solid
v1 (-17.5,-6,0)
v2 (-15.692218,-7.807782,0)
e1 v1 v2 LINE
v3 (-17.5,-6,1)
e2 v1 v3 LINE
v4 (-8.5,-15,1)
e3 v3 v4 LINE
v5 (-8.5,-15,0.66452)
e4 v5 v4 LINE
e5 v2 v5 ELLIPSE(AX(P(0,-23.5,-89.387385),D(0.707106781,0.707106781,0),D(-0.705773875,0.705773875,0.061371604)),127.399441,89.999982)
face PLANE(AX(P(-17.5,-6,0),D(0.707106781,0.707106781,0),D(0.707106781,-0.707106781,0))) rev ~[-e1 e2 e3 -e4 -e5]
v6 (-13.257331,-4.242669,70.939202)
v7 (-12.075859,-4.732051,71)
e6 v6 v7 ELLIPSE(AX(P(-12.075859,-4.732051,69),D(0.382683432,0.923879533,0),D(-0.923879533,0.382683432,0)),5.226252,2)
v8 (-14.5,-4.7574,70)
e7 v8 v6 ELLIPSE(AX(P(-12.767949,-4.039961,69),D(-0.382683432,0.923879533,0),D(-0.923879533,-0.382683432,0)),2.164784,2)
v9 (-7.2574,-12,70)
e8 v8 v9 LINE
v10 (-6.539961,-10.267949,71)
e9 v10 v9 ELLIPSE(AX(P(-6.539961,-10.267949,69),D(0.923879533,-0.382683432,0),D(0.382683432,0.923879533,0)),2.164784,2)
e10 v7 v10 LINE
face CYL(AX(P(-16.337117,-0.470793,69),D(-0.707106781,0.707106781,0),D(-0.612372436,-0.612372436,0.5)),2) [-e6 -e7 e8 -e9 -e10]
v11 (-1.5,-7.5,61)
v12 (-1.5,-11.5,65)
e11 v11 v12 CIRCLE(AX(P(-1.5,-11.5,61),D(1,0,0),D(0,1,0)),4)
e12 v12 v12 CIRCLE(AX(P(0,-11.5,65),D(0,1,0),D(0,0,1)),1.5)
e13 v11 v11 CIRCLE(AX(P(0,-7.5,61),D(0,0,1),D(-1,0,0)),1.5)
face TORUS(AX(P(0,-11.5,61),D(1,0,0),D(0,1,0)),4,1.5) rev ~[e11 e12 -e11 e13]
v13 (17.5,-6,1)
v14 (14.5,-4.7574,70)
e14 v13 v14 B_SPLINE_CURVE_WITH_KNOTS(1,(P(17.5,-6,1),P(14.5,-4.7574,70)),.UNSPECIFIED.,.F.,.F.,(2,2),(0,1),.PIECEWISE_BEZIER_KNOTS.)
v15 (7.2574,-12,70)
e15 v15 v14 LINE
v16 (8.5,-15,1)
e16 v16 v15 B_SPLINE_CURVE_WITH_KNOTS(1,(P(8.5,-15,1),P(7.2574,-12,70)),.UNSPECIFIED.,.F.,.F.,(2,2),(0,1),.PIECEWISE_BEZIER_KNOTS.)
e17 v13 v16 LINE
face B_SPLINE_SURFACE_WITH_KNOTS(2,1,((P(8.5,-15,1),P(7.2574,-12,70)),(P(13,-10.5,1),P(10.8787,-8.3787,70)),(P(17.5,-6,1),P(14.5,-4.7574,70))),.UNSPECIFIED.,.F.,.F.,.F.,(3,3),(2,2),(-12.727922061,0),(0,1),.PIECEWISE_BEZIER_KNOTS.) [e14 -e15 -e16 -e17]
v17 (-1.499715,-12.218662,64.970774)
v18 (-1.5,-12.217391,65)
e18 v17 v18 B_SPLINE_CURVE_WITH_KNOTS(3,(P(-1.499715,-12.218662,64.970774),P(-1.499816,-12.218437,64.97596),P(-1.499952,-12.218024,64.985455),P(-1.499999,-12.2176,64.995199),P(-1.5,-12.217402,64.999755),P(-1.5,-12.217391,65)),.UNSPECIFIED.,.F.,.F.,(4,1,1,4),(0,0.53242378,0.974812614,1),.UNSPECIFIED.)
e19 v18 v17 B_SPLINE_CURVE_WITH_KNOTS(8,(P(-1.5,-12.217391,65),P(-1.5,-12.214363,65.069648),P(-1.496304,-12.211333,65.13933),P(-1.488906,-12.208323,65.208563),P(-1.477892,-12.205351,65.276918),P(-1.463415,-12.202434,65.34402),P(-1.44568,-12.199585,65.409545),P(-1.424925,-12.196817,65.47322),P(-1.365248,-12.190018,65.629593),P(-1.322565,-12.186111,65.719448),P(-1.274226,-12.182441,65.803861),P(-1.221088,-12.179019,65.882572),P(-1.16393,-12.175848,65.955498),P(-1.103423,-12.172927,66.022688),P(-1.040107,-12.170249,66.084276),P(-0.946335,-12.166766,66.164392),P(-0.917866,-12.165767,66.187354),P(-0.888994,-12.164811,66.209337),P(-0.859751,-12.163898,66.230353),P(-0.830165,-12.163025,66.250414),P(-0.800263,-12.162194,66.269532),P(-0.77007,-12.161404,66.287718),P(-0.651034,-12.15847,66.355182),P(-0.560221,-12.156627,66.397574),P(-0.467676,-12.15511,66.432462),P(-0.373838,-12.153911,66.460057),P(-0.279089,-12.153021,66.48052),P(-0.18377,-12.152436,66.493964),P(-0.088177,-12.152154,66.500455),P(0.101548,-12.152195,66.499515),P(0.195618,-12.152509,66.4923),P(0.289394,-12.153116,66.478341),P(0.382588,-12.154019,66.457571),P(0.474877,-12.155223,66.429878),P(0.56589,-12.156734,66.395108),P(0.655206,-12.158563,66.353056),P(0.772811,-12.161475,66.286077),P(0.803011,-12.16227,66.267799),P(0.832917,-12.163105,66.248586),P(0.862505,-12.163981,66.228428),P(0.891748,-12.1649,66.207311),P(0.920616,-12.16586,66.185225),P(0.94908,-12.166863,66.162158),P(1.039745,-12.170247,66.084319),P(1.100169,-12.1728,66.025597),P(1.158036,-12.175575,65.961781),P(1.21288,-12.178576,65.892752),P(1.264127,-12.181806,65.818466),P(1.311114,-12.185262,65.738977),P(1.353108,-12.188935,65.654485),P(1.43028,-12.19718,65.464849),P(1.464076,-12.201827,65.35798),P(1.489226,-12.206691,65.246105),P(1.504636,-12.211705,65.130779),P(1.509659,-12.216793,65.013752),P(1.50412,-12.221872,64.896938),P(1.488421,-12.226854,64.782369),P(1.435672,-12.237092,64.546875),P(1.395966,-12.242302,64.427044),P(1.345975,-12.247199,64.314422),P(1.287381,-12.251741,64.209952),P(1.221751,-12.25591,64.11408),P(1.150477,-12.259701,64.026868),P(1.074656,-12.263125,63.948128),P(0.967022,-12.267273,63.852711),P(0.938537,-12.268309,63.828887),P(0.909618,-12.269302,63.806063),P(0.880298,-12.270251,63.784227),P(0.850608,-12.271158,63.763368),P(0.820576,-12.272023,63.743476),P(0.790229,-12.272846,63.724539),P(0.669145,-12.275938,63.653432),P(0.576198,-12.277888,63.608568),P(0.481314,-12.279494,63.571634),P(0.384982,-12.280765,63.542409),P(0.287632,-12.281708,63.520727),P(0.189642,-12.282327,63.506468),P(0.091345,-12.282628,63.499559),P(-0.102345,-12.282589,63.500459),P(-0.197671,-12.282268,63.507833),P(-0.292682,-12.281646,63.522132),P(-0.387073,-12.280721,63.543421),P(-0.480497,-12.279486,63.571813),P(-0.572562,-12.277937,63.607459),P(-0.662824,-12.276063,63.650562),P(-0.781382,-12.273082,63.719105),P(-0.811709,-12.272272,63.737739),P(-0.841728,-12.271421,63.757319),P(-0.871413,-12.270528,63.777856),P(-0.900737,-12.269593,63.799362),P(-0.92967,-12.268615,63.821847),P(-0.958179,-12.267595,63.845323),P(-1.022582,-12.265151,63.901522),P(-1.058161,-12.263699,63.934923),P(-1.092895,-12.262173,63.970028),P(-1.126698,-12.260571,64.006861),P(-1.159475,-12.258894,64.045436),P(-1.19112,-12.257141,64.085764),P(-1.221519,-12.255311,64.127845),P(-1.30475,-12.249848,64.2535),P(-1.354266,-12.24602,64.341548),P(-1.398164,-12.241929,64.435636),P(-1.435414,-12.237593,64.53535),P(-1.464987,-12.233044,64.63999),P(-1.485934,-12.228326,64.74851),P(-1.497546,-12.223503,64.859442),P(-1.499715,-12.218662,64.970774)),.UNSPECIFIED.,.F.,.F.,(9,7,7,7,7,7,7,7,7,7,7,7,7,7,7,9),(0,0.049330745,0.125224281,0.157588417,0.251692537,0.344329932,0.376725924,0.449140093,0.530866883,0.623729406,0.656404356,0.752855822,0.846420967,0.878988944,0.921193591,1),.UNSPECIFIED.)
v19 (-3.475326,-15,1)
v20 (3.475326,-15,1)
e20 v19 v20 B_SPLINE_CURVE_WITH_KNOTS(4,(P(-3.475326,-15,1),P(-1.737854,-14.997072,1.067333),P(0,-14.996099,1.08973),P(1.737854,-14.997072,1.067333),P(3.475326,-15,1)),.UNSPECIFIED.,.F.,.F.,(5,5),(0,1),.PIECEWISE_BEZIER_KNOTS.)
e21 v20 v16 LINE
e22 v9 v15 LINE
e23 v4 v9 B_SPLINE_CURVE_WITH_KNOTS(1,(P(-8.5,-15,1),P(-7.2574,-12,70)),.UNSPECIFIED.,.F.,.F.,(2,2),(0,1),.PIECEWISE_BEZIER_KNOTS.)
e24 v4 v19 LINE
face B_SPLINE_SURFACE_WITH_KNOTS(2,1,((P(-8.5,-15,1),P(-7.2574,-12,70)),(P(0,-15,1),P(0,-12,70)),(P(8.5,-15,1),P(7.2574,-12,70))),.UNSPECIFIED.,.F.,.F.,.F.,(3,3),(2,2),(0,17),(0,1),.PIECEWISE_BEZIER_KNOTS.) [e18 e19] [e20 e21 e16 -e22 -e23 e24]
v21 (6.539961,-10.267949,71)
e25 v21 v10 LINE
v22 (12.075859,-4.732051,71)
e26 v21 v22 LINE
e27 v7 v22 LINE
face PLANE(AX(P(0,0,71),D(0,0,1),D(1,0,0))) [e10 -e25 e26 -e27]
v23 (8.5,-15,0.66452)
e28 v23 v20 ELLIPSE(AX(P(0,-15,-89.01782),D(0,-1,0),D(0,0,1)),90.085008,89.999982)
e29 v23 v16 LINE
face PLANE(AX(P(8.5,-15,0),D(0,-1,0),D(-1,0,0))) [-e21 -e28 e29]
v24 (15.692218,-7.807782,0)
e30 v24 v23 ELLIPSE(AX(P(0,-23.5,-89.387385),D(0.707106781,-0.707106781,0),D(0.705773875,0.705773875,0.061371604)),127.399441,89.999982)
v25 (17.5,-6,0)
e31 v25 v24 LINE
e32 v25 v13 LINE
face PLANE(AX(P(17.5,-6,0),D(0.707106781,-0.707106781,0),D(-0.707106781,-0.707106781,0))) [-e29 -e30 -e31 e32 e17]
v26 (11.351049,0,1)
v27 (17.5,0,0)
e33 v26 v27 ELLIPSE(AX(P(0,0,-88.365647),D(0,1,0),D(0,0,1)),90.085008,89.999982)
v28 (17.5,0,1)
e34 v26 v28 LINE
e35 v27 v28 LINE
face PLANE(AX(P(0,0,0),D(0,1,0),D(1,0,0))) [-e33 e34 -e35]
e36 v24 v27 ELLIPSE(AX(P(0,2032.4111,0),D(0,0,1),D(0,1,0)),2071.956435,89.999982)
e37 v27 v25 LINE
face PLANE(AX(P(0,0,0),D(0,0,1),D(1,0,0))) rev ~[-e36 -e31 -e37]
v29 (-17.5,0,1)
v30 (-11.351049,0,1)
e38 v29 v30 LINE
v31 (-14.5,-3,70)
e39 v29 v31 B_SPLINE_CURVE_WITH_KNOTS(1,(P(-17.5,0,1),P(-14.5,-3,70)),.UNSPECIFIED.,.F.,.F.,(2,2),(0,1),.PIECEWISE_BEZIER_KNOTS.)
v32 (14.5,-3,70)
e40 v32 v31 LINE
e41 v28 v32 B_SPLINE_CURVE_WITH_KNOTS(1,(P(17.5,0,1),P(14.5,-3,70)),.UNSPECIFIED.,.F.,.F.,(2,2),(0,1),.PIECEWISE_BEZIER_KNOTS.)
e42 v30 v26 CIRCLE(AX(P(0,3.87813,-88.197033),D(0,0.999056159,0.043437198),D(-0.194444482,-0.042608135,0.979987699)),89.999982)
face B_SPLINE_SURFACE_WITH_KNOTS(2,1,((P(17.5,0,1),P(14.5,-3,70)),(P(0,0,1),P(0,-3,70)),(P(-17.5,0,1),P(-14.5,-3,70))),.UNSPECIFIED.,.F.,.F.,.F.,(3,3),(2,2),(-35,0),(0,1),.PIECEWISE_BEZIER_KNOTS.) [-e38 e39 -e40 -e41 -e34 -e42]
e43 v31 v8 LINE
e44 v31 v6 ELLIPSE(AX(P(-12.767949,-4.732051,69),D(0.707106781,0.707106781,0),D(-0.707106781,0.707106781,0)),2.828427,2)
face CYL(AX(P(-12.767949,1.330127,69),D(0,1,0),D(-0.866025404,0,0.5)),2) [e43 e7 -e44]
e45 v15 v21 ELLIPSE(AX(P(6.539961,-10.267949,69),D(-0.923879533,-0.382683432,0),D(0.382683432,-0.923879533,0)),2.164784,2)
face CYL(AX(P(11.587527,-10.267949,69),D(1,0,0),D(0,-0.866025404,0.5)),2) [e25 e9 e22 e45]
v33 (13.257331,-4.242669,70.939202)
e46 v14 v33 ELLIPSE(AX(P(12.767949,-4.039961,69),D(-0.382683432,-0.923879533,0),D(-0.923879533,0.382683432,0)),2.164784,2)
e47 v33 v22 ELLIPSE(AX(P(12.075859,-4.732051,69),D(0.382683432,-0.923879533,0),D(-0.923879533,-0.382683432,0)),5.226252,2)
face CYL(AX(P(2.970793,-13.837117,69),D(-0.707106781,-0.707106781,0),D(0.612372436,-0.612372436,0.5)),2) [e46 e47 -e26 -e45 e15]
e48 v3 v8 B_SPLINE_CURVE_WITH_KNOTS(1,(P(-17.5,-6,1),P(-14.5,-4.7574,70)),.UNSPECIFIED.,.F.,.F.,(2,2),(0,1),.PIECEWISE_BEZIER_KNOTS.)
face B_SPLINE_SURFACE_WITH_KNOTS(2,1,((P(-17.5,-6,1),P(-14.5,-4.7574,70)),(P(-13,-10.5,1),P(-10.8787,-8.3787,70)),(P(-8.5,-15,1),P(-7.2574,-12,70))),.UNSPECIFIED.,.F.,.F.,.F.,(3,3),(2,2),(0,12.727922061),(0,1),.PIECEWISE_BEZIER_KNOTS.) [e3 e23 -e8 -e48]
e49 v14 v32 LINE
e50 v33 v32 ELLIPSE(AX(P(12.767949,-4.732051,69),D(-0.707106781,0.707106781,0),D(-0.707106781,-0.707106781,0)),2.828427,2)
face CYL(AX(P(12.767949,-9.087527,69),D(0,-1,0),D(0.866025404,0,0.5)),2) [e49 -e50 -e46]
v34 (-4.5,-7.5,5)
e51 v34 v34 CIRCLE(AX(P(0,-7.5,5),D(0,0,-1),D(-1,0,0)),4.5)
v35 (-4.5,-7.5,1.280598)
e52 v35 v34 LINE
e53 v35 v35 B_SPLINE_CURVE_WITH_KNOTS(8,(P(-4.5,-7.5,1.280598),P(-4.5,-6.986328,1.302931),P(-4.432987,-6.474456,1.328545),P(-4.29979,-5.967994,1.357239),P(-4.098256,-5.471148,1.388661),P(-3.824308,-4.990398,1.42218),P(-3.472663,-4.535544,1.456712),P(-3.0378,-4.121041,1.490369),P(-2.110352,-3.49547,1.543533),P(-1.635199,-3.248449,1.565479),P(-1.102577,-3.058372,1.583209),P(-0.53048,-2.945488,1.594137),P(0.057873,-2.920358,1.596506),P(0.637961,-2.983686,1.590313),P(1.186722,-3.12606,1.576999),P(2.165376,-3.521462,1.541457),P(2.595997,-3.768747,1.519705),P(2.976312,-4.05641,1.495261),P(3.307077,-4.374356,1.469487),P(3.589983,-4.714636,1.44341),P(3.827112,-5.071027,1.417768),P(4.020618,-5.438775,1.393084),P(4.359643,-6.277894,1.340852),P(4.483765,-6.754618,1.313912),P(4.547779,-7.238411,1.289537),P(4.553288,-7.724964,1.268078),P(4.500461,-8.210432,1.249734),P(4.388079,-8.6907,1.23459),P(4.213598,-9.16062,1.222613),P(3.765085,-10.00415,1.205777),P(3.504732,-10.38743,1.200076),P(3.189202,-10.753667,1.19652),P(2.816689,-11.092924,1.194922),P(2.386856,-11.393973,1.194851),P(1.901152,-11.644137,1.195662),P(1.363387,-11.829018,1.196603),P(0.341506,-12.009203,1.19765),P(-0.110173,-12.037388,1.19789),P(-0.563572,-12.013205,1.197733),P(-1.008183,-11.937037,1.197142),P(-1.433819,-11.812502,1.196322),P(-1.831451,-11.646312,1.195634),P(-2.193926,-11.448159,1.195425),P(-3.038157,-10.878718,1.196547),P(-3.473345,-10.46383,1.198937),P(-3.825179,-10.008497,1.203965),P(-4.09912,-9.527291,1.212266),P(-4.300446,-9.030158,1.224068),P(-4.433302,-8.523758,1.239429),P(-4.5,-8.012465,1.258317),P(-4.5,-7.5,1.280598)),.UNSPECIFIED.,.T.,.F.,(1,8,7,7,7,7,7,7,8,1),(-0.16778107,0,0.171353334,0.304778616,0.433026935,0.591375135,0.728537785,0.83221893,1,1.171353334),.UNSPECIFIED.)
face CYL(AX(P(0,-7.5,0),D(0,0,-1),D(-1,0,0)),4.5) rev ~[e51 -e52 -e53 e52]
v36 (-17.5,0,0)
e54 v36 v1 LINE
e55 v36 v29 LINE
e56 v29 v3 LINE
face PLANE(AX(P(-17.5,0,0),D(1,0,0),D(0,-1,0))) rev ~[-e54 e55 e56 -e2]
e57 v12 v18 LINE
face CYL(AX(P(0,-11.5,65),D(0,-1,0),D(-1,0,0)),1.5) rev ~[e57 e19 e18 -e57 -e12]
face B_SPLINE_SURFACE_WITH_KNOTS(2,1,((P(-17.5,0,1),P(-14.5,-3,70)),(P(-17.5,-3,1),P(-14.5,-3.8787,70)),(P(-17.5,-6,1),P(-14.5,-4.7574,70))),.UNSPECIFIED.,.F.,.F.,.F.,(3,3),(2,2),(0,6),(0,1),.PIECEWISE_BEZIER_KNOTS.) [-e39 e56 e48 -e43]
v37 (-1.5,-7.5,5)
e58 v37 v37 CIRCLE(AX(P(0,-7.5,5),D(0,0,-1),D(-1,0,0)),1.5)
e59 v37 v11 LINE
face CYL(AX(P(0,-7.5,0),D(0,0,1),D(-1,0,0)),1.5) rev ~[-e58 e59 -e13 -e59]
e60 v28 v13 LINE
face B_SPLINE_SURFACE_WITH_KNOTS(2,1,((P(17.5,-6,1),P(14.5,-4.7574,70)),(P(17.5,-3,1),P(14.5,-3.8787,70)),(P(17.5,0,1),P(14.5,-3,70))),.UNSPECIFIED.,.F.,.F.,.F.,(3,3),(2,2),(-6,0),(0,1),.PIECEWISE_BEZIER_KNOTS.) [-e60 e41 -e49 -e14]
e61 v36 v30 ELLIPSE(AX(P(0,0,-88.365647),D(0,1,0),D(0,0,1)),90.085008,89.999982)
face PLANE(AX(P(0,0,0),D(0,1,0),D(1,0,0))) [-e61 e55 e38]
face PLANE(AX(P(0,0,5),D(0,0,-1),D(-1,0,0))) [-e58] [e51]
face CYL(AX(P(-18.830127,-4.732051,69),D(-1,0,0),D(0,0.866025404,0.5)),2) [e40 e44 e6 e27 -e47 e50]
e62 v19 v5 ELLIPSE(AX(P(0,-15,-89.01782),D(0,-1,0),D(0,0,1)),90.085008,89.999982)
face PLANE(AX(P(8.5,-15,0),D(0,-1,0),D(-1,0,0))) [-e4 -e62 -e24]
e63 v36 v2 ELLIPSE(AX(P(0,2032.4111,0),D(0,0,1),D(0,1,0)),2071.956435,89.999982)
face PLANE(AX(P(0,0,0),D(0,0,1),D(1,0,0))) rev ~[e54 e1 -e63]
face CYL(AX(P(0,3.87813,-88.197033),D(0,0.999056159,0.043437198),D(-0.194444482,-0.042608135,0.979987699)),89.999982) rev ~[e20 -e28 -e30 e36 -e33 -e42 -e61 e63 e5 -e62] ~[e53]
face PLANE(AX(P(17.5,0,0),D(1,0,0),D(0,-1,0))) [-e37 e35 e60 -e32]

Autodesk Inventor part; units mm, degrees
ref_plane "YZ Plane" through (0, 0, 0) normal (1, 0, 0) x (0, 1, 0)
ref_plane "XZ Plane" through (0, 0, 0) normal (0, 1, 0) x (-1, 0, 0)
sketch "Sketch1" plane through (0, 0, 0) normal (0, 0, 1) x (1, 0, 0)
  line L0 (0, 0) -> (17.5, 0)
  line L1 (17.5, 0) -> (17.5, -6)
  line L2 (17.5, -6) -> (8.5, -15)
  line L3 (8.5, -15) -> (0, -15)
  line L4 (0, 0) -> (0, -15)
  line L5 (0, 0) -> (-17.5, 0)
  line L6 (-17.5, 0) -> (-17.5, -6)
  line L7 (-17.5, -6) -> (-8.5, -15)
  line L8 (-8.5, -15) -> (0, -15)
  dimension "d0" = 35
  dimension "d1" = 15
  dimension "d2" = 45
  dimension "d3" = 6
ref_plane "Work Plane1" through (0, 0, 70) normal (0, 0, 1) x (1, 0, 0)
sketch "Sketch2" plane through (0, 0, 70) normal (0, 0, 1) x (1, 0, 0)
  line L0 (-17.5, -6) -> (-8.5, -15) projected
  line L1 (-17.5, 0) -> (-17.5, -6) projected
  line L2 (0, 0) -> (-17.5, 0) projected
  line L3 (0, 0) -> (17.5, 0) projected
  line L4 (17.5, 0) -> (17.5, -6) projected
  line L5 (17.5, -6) -> (8.5, -15) projected
  line L6 (8.5, -15) -> (0, -15) projected
  line L7 (-8.5, -15) -> (0, -15) projected
  line L8 (-14.5, -4.7574) -> (-7.2574, -12)
  line L9 (-7.2574, -12) -> (0, -12)
  line L10 (0, -12) -> (7.2574, -12)
  line L11 (7.2574, -12) -> (14.5, -4.7574)
  line L12 (14.5, -4.7574) -> (14.5, -3)
  line L13 (14.5, -3) -> (0, -3)
  line L14 (0, -3) -> (-14.5, -3)
  line L15 (-14.5, -3) -> (-14.5, -4.7574)
  dimension "d5" = 3
extrude "Extrusion1" add sketch "Sketch1" along normal blind 1
extrude "Extrusion2" add sketch "Sketch2" along normal blind 1 contours L15 L14 L13 L12 L11 L10 L9 L8
loft "Loft1" add section 1 edges at (-13, -10.5, 1) (0, -15, 1) (13, -10.5, 1) (17.5, -3, 1) (0, 0, 1) (-17.5, -3, 1) section 2 edges at (0, -3, 70) (14.5, -3.8787, 70) (10.8787, -8.3787, 70) (0, -12, 70) (-10.8787, -8.3787, 70) (-14.5, -3.8787, 70)
sketch "Sketch6" plane through (0, 0, 0) normal (1, 0, 0) x (0, 1, 0)
  line L0 (-15, 1) -> (-12, 70) projected
  line L1 (-12, 70) -> (-12, 71) projected
  line L2 (-12, 71) -> (-3, 71) projected
  line L3 (-3, 71) -> (-3, 70) projected
  line L4 (-3, 70) -> (0, 1) projected
  line L5 (0, 1) -> (0, 0) projected
  line L6 (0, 0) -> (-15, 0) projected
  line L7 (-15, 0) -> (-15, 1) projected
  line L8 (-6, 0) -> (-15, 0) projected
  line L9 (-7.5, 0) -> (-7.5, 61)
  line L10 (-11.5, 65) -> (-15, 65)
  arc A0 (-7.5, 61) -> (-11.5, 65) centre (-11.5, 61) ccw
  point P0 (-7.5, 65)
  dimension "d20" = 65
  dimension "d21" = 4
  dimension "d23" = 7.5
  dimension "d24" = 15
sketch "Sketch7" plane through (0, 0, 0) normal (0, 0, -1) x (-1, 0, 0)
  line L0 (17.5, 0) -> (17.5, -6) projected
  line L1 (17.5, -6) -> (8.5, -15) projected
  line L2 (8.5, -15) -> (-8.5, -15) projected
  line L3 (-8.5, -15) -> (-17.5, -6) projected
  line L4 (-17.5, -6) -> (-17.5, 0) projected
  line L5 (-17.5, 0) -> (17.5, 0) projected
  line L6 (17.5, -6) -> (8.5, -15) projected
  line L7 (17.5, 0) -> (17.5, -6) projected
  line L8 (-17.5, 0) -> (17.5, 0) projected
  line L9 (-17.5, -6) -> (-17.5, 0) projected
  line L10 (-8.5, -15) -> (-17.5, -6) projected
  line L11 (8.5, -15) -> (-8.5, -15) projected
  circle A0 centre (0, -7.5) radius 1.5
  point P0 (0, 0)
  dimension "d25" = 7.5
  dimension "d26" = 3
  dimension "d27" = 17.5
sweep "Sweep1" cut profiles "Sketch7" path "Sketch6" path curves L9 A0 L10 contours A0
sketch "Sketch8" plane through (0, 0, 0) normal (0, 0, -1) x (-1, 0, 0)
  circle A0 centre (0, -7.5) radius 1.5 projected
  line L0 (17.5, -6) -> (8.5, -15) projected
  line L1 (17.5, 0) -> (17.5, -6) projected
  line L2 (-17.5, 0) -> (17.5, 0) projected
  line L3 (-17.5, -6) -> (-17.5, 0) projected
  line L4 (-8.5, -15) -> (-17.5, -6) projected
  line L5 (8.5, -15) -> (-8.5, -15) projected
  circle A1 centre (0, -7.5) radius 4.5
  point P0 (0, 0)
  dimension "d30" = 9
extrude "Extrusion4" cut sketch "Sketch8" against normal blind 5 contours A1
fillet "Fillet1" radius 0.5 1 edges at (4.5, -7.5, 0)
fillet "Fillet2" radius 2 6 edges at (10.8787, -8.3787, 71) (0, -12, 71) (-10.8787, -8.3787, 71) (-14.5, -3.8787, 71) (0, -3, 71) (14.5, -3.8787, 71)
sketch "Sketch9" plane through (-17.5, 0, 1) normal (0, 0.9990562, 0.0434372) x (1, 0, 0)
  line L0 (0, 0.9991) -> (0, 0) projected
  line L1 (35, 0.9991) -> (0, 0.9991) projected
  line L2 (35, 0.9991) -> (35, 0) projected
  arc A0 (0, 0.9991) -> (35, 0.9991) centre (17.5, 89.2813) ccw
  point P0 (17.5, 0.9991)
  dimension "d35" = 90
extrude "Extrusion5" cut sketch "Sketch9" against normal through all
properties part number "_3DPrint"
